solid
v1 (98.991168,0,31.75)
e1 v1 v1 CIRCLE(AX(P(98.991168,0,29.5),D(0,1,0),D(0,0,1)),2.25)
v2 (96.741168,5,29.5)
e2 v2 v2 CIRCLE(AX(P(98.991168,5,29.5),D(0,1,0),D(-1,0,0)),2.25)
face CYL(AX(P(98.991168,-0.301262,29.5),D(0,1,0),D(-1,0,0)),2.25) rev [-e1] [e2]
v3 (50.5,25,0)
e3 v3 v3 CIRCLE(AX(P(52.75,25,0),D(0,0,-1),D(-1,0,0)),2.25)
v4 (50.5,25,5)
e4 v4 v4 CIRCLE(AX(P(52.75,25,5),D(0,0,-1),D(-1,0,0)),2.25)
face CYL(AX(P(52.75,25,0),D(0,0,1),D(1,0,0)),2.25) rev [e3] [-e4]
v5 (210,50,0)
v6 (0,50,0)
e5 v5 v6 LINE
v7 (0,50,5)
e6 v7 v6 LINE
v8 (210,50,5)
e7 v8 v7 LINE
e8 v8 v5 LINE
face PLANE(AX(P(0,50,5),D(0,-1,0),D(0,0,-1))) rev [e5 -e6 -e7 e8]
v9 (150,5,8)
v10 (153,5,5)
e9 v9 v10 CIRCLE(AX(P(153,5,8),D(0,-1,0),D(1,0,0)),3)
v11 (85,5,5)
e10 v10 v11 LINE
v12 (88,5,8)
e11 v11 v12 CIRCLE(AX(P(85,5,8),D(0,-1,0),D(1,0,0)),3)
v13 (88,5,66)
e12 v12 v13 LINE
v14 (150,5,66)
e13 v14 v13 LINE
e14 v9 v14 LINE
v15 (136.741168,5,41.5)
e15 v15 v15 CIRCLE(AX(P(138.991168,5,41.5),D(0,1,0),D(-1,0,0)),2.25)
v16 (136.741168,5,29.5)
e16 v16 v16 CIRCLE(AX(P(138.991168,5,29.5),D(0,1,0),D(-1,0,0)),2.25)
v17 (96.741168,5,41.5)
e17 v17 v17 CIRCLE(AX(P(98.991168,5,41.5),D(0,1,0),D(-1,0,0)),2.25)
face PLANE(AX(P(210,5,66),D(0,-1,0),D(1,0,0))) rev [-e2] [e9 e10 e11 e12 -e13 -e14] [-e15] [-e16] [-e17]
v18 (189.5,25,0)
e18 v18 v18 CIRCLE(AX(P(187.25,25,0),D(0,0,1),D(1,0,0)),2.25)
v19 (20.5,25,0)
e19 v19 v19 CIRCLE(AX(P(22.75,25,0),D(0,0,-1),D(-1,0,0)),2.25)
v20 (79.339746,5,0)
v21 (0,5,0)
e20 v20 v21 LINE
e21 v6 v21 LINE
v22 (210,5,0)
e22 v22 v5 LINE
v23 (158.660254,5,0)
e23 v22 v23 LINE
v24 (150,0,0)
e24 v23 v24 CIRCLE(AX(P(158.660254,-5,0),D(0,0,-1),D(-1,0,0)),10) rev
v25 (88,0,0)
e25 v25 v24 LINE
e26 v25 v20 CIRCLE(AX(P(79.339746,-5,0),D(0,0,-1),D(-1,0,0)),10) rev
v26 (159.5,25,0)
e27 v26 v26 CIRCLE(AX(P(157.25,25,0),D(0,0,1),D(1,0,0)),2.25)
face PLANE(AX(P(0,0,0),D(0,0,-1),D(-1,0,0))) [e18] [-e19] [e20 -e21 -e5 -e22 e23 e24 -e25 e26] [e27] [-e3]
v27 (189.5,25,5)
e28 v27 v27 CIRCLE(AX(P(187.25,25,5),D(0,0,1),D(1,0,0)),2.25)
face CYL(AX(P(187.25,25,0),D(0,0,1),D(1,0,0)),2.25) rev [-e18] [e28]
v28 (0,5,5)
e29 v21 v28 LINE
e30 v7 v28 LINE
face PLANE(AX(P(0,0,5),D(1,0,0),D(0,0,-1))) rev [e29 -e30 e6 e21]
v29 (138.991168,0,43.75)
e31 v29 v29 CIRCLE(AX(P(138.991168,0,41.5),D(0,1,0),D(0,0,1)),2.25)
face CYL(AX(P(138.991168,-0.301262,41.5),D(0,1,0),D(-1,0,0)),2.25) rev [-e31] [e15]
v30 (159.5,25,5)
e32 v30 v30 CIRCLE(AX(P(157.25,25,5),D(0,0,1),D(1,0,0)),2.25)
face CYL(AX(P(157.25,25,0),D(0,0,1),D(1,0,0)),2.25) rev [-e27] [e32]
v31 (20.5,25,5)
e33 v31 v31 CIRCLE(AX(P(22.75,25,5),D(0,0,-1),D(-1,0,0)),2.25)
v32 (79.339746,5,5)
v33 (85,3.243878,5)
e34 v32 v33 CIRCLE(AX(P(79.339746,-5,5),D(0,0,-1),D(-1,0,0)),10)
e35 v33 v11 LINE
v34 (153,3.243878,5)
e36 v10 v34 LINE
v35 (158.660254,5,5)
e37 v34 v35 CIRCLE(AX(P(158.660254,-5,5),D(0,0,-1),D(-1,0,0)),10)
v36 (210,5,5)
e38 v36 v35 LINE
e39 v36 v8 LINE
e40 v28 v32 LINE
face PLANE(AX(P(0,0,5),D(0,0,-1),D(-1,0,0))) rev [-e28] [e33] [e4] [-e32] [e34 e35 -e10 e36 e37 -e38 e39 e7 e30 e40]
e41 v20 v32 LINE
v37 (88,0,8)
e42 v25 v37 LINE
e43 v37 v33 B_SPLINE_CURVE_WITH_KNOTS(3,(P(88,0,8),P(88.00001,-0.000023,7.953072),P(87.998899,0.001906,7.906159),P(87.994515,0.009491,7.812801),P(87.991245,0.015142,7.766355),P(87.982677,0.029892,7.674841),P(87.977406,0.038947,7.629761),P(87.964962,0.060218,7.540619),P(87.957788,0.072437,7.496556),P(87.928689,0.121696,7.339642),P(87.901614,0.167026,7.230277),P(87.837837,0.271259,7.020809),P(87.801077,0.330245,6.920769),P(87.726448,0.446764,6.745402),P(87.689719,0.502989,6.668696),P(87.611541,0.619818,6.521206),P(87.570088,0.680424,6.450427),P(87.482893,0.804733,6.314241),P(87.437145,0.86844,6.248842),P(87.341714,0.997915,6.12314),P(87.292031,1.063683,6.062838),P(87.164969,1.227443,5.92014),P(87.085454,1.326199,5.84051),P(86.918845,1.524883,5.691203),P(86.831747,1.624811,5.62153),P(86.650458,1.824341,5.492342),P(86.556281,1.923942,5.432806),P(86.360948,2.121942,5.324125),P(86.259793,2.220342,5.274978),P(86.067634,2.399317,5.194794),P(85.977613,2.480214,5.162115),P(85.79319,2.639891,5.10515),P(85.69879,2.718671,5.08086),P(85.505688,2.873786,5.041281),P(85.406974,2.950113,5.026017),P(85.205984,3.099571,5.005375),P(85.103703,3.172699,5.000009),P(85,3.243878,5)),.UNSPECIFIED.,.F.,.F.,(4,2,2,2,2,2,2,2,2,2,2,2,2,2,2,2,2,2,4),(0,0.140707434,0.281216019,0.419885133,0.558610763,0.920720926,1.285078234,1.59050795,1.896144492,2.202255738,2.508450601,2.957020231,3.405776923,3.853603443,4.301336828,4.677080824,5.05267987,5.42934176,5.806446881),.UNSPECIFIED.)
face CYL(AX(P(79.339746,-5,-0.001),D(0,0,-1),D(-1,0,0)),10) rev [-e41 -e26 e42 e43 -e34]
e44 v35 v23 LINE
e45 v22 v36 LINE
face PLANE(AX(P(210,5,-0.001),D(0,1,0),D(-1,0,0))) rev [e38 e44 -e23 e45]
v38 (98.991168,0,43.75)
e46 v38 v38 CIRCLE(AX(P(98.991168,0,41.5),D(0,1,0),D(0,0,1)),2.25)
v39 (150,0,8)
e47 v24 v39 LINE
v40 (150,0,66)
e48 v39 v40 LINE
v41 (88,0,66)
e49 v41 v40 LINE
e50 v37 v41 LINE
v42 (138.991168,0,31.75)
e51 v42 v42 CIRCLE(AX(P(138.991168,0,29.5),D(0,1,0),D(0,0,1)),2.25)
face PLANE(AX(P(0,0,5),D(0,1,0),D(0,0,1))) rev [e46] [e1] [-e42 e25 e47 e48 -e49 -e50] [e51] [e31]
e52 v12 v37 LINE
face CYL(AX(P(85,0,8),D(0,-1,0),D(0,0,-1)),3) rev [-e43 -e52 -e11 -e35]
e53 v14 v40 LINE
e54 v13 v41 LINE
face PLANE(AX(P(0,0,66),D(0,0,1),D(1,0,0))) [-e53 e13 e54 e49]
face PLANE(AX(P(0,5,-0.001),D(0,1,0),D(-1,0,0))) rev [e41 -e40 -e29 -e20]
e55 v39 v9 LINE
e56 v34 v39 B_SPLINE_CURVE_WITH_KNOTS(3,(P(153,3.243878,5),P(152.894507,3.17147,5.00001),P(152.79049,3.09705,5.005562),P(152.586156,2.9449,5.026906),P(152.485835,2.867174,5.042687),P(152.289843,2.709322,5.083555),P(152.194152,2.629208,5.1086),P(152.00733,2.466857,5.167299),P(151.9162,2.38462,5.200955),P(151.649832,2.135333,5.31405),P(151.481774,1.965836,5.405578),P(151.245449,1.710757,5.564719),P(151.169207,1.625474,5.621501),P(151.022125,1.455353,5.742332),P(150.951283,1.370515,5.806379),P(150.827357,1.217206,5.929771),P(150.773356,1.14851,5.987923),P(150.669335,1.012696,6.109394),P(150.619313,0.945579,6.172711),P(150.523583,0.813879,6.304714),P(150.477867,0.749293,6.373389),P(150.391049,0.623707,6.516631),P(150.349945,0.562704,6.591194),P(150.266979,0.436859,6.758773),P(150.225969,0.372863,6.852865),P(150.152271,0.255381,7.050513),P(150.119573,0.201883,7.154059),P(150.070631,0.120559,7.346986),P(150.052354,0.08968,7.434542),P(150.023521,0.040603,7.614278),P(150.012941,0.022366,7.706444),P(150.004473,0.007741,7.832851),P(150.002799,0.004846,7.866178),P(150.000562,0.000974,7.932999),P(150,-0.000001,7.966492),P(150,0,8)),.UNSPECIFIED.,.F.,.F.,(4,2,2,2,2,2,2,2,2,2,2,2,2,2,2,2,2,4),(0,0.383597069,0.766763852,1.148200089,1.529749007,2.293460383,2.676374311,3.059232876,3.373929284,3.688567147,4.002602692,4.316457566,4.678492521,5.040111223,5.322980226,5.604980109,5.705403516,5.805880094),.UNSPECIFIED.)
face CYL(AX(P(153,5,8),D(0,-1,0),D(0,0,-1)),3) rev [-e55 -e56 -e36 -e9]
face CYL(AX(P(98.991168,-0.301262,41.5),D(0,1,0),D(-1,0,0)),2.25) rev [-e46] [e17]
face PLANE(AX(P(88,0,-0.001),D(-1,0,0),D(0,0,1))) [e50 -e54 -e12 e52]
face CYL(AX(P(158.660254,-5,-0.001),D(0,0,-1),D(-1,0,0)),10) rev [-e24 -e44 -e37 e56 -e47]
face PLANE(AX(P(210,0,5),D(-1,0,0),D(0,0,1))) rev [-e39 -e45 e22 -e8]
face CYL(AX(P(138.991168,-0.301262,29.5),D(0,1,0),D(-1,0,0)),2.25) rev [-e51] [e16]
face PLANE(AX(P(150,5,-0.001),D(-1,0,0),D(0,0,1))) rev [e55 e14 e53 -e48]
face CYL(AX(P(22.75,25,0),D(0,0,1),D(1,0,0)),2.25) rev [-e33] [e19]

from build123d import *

# Parameters (mm, degrees)
SKETCH_1_W          = 210
SKETCH_1_H          = 50
EXTRUDE_1_DEPTH     = 5
SKETCH_3_R          = 2.25
CUT_EXTRUDE_1_DEPTH = 5
SKETCH_4_W          = 210
SKETCH_4_H          = 5
EXTRUDE_2_DEPTH     = 61
CUT_EXTRUDE_2_REACH = 227.734
SKETCH_6_W          = 60
SKETCH_6_H          = 5
FILLET_1_R          = 10
CUT_EXTRUDE_3_REACH = 227.734
SKETCH_7_W          = 88
SKETCH_7_H          = 5
FILLET_2_R          = 10
FILLET_6_R          = 3
SKETCH_11_R         = 2.25
CUT_EXTRUDE_4_DEPTH = 225.67977212


with BuildPart() as part:
    # 草图1 → 凸台-拉伸1 (new body)
    with BuildSketch(Plane.XY):
        with Locations((105, 25)):
            Rectangle(SKETCH_1_W, SKETCH_1_H)
    extrude(amount=EXTRUDE_1_DEPTH)

    # 草图3 → 切除-拉伸1 (cut)
    with BuildSketch(Plane.XY.offset(5)):
        with Locations((157.25, 25)):
            Circle(SKETCH_3_R)
        with Locations((187.25, 25)):
            Circle(SKETCH_3_R)
        with Locations(Location((22.75, 25, 0), (0, 0, 180))):
            Circle(SKETCH_3_R)
        with Locations(Location((52.75, 25, 0), (0, 0, 180))):
            Circle(SKETCH_3_R)
    extrude(amount=-CUT_EXTRUDE_1_DEPTH, mode=Mode.SUBTRACT)

    # 草图4 → 凸台-拉伸2 (add)
    with BuildSketch(Plane.XY.offset(5)):
        with Locations((105, 2.5)):
            Rectangle(SKETCH_4_W, SKETCH_4_H)
    extrude(amount=EXTRUDE_2_DEPTH)

    # 草图6 → 切除-拉伸2 (cut, up to next)
    with BuildSketch(Plane.XY.offset(66), mode=Mode.PRIVATE) as cut_extrude_2_sk1:
        with Locations((180, 2.5)):
            Rectangle(SKETCH_6_W, SKETCH_6_H)
    cut_extrude_2_tool1 = extrude(cut_extrude_2_sk1.sketch, amount=-CUT_EXTRUDE_2_REACH, mode=Mode.PRIVATE) & part.part
    add(cut_extrude_2_tool1.solids().sort_by_distance((180, 2.5, 66))[0], mode=Mode.SUBTRACT)

    # 圆角1
    # the kernel refuses this fillet: 10 mm, written as the material it adds along each edge
    with BuildSketch(Plane(origin=(150, 5, 0), x_dir=(0, -1, 0), z_dir=(0, 0, 1))) as fillet_1_piece_1:
        with BuildLine():
            CenterArc((10, 8.660254038), FILLET_1_R, 180, 60)
            Line((0, 8.660254038), (0, 0))
            Line((0, 0), (5, 0))
        make_face()
    extrude(amount=5)

    # 草图7 → 切除-拉伸3 (cut, up to next)
    with BuildSketch(Plane.XY.offset(66), mode=Mode.PRIVATE) as cut_extrude_3_sk1:
        with Locations((44, 2.5)):
            Rectangle(SKETCH_7_W, SKETCH_7_H)
    cut_extrude_3_tool1 = extrude(cut_extrude_3_sk1.sketch, amount=-CUT_EXTRUDE_3_REACH, mode=Mode.PRIVATE) & part.part
    add(cut_extrude_3_tool1.solids().sort_by_distance((44, 2.5, 66))[0], mode=Mode.SUBTRACT)

    # 圆角2
    # the kernel refuses this fillet: 10 mm, written as the material it adds along each edge
    with BuildSketch(Plane(origin=(88, 5, 0), x_dir=(0, -1, 0), z_dir=(0, 0, 1))) as fillet_2_piece_1:
        with BuildLine():
            CenterArc((10, -8.660254038), FILLET_2_R, 120, 60)
            Line((0, -8.660254038), (0, 0))
            Line((0, 0), (5, 0))
        make_face()
    extrude(amount=5)

    # 圆角6
    # the kernel refuses this fillet: 3 mm, written as the material it adds along each edge
    with BuildSketch(Plane(origin=(150, 5, 5), x_dir=(1, 0, 0), z_dir=(0, -1, 0))) as fillet_6_piece_1_section:
        with BuildLine():
            CenterArc((FILLET_6_R, FILLET_6_R), FILLET_6_R, 180, 90)
            Line((0, FILLET_6_R), (0, 0))
            Line((0, 0), (FILLET_6_R, 0))
        make_face()
    fillet_6_piece_1 = extrude(amount=5, mode=Mode.PRIVATE)
    fillet_6_piece_1 = fillet_6_piece_1 - Plane(origin=(158.660254038, -5, 5.756133445), x_dir=(0, -1, 0), z_dir=(0, 0, -1)) * Cylinder(10, 22, mode=Mode.PRIVATE)
    add(fillet_6_piece_1)
    with BuildSketch(Plane(origin=(88, 5, 5), x_dir=(-1, 0, 0), z_dir=(0, -1, 0))) as fillet_6_piece_2_section:
        with BuildLine():
            CenterArc((FILLET_6_R, -FILLET_6_R), FILLET_6_R, 90, 90)
            Line((0, -FILLET_6_R), (0, 0))
            Line((0, 0), (FILLET_6_R, 0))
        make_face()
    fillet_6_piece_2 = extrude(amount=5, mode=Mode.PRIVATE)
    fillet_6_piece_2 = fillet_6_piece_2 - Plane(origin=(79.339745962, -5, 5.756136784), x_dir=(0, -1, 0), z_dir=(0, 0, -1)) * Cylinder(10, 22, mode=Mode.PRIVATE)
    add(fillet_6_piece_2)

    # 草图11 → 切除-拉伸4 (cut, through all)
    with BuildSketch(Plane(origin=(0, 5, 0), x_dir=(1, 0, 0), z_dir=(0, 1, 0))):
        with Locations(Location((98.991167509, -29.5, 0), (0, 0, 180))):
            Circle(SKETCH_11_R)
        with Locations(Location((138.991167509, -29.5, 0), (0, 0, 180))):
            Circle(SKETCH_11_R)
        with Locations(Location((98.991167509, -41.5, 0), (0, 0, 180))):
            Circle(SKETCH_11_R)
        with Locations(Location((138.991167509, -41.5, 0), (0, 0, 180))):
            Circle(SKETCH_11_R)
    extrude(amount=-CUT_EXTRUDE_4_DEPTH, mode=Mode.SUBTRACT)


solid = part.part
